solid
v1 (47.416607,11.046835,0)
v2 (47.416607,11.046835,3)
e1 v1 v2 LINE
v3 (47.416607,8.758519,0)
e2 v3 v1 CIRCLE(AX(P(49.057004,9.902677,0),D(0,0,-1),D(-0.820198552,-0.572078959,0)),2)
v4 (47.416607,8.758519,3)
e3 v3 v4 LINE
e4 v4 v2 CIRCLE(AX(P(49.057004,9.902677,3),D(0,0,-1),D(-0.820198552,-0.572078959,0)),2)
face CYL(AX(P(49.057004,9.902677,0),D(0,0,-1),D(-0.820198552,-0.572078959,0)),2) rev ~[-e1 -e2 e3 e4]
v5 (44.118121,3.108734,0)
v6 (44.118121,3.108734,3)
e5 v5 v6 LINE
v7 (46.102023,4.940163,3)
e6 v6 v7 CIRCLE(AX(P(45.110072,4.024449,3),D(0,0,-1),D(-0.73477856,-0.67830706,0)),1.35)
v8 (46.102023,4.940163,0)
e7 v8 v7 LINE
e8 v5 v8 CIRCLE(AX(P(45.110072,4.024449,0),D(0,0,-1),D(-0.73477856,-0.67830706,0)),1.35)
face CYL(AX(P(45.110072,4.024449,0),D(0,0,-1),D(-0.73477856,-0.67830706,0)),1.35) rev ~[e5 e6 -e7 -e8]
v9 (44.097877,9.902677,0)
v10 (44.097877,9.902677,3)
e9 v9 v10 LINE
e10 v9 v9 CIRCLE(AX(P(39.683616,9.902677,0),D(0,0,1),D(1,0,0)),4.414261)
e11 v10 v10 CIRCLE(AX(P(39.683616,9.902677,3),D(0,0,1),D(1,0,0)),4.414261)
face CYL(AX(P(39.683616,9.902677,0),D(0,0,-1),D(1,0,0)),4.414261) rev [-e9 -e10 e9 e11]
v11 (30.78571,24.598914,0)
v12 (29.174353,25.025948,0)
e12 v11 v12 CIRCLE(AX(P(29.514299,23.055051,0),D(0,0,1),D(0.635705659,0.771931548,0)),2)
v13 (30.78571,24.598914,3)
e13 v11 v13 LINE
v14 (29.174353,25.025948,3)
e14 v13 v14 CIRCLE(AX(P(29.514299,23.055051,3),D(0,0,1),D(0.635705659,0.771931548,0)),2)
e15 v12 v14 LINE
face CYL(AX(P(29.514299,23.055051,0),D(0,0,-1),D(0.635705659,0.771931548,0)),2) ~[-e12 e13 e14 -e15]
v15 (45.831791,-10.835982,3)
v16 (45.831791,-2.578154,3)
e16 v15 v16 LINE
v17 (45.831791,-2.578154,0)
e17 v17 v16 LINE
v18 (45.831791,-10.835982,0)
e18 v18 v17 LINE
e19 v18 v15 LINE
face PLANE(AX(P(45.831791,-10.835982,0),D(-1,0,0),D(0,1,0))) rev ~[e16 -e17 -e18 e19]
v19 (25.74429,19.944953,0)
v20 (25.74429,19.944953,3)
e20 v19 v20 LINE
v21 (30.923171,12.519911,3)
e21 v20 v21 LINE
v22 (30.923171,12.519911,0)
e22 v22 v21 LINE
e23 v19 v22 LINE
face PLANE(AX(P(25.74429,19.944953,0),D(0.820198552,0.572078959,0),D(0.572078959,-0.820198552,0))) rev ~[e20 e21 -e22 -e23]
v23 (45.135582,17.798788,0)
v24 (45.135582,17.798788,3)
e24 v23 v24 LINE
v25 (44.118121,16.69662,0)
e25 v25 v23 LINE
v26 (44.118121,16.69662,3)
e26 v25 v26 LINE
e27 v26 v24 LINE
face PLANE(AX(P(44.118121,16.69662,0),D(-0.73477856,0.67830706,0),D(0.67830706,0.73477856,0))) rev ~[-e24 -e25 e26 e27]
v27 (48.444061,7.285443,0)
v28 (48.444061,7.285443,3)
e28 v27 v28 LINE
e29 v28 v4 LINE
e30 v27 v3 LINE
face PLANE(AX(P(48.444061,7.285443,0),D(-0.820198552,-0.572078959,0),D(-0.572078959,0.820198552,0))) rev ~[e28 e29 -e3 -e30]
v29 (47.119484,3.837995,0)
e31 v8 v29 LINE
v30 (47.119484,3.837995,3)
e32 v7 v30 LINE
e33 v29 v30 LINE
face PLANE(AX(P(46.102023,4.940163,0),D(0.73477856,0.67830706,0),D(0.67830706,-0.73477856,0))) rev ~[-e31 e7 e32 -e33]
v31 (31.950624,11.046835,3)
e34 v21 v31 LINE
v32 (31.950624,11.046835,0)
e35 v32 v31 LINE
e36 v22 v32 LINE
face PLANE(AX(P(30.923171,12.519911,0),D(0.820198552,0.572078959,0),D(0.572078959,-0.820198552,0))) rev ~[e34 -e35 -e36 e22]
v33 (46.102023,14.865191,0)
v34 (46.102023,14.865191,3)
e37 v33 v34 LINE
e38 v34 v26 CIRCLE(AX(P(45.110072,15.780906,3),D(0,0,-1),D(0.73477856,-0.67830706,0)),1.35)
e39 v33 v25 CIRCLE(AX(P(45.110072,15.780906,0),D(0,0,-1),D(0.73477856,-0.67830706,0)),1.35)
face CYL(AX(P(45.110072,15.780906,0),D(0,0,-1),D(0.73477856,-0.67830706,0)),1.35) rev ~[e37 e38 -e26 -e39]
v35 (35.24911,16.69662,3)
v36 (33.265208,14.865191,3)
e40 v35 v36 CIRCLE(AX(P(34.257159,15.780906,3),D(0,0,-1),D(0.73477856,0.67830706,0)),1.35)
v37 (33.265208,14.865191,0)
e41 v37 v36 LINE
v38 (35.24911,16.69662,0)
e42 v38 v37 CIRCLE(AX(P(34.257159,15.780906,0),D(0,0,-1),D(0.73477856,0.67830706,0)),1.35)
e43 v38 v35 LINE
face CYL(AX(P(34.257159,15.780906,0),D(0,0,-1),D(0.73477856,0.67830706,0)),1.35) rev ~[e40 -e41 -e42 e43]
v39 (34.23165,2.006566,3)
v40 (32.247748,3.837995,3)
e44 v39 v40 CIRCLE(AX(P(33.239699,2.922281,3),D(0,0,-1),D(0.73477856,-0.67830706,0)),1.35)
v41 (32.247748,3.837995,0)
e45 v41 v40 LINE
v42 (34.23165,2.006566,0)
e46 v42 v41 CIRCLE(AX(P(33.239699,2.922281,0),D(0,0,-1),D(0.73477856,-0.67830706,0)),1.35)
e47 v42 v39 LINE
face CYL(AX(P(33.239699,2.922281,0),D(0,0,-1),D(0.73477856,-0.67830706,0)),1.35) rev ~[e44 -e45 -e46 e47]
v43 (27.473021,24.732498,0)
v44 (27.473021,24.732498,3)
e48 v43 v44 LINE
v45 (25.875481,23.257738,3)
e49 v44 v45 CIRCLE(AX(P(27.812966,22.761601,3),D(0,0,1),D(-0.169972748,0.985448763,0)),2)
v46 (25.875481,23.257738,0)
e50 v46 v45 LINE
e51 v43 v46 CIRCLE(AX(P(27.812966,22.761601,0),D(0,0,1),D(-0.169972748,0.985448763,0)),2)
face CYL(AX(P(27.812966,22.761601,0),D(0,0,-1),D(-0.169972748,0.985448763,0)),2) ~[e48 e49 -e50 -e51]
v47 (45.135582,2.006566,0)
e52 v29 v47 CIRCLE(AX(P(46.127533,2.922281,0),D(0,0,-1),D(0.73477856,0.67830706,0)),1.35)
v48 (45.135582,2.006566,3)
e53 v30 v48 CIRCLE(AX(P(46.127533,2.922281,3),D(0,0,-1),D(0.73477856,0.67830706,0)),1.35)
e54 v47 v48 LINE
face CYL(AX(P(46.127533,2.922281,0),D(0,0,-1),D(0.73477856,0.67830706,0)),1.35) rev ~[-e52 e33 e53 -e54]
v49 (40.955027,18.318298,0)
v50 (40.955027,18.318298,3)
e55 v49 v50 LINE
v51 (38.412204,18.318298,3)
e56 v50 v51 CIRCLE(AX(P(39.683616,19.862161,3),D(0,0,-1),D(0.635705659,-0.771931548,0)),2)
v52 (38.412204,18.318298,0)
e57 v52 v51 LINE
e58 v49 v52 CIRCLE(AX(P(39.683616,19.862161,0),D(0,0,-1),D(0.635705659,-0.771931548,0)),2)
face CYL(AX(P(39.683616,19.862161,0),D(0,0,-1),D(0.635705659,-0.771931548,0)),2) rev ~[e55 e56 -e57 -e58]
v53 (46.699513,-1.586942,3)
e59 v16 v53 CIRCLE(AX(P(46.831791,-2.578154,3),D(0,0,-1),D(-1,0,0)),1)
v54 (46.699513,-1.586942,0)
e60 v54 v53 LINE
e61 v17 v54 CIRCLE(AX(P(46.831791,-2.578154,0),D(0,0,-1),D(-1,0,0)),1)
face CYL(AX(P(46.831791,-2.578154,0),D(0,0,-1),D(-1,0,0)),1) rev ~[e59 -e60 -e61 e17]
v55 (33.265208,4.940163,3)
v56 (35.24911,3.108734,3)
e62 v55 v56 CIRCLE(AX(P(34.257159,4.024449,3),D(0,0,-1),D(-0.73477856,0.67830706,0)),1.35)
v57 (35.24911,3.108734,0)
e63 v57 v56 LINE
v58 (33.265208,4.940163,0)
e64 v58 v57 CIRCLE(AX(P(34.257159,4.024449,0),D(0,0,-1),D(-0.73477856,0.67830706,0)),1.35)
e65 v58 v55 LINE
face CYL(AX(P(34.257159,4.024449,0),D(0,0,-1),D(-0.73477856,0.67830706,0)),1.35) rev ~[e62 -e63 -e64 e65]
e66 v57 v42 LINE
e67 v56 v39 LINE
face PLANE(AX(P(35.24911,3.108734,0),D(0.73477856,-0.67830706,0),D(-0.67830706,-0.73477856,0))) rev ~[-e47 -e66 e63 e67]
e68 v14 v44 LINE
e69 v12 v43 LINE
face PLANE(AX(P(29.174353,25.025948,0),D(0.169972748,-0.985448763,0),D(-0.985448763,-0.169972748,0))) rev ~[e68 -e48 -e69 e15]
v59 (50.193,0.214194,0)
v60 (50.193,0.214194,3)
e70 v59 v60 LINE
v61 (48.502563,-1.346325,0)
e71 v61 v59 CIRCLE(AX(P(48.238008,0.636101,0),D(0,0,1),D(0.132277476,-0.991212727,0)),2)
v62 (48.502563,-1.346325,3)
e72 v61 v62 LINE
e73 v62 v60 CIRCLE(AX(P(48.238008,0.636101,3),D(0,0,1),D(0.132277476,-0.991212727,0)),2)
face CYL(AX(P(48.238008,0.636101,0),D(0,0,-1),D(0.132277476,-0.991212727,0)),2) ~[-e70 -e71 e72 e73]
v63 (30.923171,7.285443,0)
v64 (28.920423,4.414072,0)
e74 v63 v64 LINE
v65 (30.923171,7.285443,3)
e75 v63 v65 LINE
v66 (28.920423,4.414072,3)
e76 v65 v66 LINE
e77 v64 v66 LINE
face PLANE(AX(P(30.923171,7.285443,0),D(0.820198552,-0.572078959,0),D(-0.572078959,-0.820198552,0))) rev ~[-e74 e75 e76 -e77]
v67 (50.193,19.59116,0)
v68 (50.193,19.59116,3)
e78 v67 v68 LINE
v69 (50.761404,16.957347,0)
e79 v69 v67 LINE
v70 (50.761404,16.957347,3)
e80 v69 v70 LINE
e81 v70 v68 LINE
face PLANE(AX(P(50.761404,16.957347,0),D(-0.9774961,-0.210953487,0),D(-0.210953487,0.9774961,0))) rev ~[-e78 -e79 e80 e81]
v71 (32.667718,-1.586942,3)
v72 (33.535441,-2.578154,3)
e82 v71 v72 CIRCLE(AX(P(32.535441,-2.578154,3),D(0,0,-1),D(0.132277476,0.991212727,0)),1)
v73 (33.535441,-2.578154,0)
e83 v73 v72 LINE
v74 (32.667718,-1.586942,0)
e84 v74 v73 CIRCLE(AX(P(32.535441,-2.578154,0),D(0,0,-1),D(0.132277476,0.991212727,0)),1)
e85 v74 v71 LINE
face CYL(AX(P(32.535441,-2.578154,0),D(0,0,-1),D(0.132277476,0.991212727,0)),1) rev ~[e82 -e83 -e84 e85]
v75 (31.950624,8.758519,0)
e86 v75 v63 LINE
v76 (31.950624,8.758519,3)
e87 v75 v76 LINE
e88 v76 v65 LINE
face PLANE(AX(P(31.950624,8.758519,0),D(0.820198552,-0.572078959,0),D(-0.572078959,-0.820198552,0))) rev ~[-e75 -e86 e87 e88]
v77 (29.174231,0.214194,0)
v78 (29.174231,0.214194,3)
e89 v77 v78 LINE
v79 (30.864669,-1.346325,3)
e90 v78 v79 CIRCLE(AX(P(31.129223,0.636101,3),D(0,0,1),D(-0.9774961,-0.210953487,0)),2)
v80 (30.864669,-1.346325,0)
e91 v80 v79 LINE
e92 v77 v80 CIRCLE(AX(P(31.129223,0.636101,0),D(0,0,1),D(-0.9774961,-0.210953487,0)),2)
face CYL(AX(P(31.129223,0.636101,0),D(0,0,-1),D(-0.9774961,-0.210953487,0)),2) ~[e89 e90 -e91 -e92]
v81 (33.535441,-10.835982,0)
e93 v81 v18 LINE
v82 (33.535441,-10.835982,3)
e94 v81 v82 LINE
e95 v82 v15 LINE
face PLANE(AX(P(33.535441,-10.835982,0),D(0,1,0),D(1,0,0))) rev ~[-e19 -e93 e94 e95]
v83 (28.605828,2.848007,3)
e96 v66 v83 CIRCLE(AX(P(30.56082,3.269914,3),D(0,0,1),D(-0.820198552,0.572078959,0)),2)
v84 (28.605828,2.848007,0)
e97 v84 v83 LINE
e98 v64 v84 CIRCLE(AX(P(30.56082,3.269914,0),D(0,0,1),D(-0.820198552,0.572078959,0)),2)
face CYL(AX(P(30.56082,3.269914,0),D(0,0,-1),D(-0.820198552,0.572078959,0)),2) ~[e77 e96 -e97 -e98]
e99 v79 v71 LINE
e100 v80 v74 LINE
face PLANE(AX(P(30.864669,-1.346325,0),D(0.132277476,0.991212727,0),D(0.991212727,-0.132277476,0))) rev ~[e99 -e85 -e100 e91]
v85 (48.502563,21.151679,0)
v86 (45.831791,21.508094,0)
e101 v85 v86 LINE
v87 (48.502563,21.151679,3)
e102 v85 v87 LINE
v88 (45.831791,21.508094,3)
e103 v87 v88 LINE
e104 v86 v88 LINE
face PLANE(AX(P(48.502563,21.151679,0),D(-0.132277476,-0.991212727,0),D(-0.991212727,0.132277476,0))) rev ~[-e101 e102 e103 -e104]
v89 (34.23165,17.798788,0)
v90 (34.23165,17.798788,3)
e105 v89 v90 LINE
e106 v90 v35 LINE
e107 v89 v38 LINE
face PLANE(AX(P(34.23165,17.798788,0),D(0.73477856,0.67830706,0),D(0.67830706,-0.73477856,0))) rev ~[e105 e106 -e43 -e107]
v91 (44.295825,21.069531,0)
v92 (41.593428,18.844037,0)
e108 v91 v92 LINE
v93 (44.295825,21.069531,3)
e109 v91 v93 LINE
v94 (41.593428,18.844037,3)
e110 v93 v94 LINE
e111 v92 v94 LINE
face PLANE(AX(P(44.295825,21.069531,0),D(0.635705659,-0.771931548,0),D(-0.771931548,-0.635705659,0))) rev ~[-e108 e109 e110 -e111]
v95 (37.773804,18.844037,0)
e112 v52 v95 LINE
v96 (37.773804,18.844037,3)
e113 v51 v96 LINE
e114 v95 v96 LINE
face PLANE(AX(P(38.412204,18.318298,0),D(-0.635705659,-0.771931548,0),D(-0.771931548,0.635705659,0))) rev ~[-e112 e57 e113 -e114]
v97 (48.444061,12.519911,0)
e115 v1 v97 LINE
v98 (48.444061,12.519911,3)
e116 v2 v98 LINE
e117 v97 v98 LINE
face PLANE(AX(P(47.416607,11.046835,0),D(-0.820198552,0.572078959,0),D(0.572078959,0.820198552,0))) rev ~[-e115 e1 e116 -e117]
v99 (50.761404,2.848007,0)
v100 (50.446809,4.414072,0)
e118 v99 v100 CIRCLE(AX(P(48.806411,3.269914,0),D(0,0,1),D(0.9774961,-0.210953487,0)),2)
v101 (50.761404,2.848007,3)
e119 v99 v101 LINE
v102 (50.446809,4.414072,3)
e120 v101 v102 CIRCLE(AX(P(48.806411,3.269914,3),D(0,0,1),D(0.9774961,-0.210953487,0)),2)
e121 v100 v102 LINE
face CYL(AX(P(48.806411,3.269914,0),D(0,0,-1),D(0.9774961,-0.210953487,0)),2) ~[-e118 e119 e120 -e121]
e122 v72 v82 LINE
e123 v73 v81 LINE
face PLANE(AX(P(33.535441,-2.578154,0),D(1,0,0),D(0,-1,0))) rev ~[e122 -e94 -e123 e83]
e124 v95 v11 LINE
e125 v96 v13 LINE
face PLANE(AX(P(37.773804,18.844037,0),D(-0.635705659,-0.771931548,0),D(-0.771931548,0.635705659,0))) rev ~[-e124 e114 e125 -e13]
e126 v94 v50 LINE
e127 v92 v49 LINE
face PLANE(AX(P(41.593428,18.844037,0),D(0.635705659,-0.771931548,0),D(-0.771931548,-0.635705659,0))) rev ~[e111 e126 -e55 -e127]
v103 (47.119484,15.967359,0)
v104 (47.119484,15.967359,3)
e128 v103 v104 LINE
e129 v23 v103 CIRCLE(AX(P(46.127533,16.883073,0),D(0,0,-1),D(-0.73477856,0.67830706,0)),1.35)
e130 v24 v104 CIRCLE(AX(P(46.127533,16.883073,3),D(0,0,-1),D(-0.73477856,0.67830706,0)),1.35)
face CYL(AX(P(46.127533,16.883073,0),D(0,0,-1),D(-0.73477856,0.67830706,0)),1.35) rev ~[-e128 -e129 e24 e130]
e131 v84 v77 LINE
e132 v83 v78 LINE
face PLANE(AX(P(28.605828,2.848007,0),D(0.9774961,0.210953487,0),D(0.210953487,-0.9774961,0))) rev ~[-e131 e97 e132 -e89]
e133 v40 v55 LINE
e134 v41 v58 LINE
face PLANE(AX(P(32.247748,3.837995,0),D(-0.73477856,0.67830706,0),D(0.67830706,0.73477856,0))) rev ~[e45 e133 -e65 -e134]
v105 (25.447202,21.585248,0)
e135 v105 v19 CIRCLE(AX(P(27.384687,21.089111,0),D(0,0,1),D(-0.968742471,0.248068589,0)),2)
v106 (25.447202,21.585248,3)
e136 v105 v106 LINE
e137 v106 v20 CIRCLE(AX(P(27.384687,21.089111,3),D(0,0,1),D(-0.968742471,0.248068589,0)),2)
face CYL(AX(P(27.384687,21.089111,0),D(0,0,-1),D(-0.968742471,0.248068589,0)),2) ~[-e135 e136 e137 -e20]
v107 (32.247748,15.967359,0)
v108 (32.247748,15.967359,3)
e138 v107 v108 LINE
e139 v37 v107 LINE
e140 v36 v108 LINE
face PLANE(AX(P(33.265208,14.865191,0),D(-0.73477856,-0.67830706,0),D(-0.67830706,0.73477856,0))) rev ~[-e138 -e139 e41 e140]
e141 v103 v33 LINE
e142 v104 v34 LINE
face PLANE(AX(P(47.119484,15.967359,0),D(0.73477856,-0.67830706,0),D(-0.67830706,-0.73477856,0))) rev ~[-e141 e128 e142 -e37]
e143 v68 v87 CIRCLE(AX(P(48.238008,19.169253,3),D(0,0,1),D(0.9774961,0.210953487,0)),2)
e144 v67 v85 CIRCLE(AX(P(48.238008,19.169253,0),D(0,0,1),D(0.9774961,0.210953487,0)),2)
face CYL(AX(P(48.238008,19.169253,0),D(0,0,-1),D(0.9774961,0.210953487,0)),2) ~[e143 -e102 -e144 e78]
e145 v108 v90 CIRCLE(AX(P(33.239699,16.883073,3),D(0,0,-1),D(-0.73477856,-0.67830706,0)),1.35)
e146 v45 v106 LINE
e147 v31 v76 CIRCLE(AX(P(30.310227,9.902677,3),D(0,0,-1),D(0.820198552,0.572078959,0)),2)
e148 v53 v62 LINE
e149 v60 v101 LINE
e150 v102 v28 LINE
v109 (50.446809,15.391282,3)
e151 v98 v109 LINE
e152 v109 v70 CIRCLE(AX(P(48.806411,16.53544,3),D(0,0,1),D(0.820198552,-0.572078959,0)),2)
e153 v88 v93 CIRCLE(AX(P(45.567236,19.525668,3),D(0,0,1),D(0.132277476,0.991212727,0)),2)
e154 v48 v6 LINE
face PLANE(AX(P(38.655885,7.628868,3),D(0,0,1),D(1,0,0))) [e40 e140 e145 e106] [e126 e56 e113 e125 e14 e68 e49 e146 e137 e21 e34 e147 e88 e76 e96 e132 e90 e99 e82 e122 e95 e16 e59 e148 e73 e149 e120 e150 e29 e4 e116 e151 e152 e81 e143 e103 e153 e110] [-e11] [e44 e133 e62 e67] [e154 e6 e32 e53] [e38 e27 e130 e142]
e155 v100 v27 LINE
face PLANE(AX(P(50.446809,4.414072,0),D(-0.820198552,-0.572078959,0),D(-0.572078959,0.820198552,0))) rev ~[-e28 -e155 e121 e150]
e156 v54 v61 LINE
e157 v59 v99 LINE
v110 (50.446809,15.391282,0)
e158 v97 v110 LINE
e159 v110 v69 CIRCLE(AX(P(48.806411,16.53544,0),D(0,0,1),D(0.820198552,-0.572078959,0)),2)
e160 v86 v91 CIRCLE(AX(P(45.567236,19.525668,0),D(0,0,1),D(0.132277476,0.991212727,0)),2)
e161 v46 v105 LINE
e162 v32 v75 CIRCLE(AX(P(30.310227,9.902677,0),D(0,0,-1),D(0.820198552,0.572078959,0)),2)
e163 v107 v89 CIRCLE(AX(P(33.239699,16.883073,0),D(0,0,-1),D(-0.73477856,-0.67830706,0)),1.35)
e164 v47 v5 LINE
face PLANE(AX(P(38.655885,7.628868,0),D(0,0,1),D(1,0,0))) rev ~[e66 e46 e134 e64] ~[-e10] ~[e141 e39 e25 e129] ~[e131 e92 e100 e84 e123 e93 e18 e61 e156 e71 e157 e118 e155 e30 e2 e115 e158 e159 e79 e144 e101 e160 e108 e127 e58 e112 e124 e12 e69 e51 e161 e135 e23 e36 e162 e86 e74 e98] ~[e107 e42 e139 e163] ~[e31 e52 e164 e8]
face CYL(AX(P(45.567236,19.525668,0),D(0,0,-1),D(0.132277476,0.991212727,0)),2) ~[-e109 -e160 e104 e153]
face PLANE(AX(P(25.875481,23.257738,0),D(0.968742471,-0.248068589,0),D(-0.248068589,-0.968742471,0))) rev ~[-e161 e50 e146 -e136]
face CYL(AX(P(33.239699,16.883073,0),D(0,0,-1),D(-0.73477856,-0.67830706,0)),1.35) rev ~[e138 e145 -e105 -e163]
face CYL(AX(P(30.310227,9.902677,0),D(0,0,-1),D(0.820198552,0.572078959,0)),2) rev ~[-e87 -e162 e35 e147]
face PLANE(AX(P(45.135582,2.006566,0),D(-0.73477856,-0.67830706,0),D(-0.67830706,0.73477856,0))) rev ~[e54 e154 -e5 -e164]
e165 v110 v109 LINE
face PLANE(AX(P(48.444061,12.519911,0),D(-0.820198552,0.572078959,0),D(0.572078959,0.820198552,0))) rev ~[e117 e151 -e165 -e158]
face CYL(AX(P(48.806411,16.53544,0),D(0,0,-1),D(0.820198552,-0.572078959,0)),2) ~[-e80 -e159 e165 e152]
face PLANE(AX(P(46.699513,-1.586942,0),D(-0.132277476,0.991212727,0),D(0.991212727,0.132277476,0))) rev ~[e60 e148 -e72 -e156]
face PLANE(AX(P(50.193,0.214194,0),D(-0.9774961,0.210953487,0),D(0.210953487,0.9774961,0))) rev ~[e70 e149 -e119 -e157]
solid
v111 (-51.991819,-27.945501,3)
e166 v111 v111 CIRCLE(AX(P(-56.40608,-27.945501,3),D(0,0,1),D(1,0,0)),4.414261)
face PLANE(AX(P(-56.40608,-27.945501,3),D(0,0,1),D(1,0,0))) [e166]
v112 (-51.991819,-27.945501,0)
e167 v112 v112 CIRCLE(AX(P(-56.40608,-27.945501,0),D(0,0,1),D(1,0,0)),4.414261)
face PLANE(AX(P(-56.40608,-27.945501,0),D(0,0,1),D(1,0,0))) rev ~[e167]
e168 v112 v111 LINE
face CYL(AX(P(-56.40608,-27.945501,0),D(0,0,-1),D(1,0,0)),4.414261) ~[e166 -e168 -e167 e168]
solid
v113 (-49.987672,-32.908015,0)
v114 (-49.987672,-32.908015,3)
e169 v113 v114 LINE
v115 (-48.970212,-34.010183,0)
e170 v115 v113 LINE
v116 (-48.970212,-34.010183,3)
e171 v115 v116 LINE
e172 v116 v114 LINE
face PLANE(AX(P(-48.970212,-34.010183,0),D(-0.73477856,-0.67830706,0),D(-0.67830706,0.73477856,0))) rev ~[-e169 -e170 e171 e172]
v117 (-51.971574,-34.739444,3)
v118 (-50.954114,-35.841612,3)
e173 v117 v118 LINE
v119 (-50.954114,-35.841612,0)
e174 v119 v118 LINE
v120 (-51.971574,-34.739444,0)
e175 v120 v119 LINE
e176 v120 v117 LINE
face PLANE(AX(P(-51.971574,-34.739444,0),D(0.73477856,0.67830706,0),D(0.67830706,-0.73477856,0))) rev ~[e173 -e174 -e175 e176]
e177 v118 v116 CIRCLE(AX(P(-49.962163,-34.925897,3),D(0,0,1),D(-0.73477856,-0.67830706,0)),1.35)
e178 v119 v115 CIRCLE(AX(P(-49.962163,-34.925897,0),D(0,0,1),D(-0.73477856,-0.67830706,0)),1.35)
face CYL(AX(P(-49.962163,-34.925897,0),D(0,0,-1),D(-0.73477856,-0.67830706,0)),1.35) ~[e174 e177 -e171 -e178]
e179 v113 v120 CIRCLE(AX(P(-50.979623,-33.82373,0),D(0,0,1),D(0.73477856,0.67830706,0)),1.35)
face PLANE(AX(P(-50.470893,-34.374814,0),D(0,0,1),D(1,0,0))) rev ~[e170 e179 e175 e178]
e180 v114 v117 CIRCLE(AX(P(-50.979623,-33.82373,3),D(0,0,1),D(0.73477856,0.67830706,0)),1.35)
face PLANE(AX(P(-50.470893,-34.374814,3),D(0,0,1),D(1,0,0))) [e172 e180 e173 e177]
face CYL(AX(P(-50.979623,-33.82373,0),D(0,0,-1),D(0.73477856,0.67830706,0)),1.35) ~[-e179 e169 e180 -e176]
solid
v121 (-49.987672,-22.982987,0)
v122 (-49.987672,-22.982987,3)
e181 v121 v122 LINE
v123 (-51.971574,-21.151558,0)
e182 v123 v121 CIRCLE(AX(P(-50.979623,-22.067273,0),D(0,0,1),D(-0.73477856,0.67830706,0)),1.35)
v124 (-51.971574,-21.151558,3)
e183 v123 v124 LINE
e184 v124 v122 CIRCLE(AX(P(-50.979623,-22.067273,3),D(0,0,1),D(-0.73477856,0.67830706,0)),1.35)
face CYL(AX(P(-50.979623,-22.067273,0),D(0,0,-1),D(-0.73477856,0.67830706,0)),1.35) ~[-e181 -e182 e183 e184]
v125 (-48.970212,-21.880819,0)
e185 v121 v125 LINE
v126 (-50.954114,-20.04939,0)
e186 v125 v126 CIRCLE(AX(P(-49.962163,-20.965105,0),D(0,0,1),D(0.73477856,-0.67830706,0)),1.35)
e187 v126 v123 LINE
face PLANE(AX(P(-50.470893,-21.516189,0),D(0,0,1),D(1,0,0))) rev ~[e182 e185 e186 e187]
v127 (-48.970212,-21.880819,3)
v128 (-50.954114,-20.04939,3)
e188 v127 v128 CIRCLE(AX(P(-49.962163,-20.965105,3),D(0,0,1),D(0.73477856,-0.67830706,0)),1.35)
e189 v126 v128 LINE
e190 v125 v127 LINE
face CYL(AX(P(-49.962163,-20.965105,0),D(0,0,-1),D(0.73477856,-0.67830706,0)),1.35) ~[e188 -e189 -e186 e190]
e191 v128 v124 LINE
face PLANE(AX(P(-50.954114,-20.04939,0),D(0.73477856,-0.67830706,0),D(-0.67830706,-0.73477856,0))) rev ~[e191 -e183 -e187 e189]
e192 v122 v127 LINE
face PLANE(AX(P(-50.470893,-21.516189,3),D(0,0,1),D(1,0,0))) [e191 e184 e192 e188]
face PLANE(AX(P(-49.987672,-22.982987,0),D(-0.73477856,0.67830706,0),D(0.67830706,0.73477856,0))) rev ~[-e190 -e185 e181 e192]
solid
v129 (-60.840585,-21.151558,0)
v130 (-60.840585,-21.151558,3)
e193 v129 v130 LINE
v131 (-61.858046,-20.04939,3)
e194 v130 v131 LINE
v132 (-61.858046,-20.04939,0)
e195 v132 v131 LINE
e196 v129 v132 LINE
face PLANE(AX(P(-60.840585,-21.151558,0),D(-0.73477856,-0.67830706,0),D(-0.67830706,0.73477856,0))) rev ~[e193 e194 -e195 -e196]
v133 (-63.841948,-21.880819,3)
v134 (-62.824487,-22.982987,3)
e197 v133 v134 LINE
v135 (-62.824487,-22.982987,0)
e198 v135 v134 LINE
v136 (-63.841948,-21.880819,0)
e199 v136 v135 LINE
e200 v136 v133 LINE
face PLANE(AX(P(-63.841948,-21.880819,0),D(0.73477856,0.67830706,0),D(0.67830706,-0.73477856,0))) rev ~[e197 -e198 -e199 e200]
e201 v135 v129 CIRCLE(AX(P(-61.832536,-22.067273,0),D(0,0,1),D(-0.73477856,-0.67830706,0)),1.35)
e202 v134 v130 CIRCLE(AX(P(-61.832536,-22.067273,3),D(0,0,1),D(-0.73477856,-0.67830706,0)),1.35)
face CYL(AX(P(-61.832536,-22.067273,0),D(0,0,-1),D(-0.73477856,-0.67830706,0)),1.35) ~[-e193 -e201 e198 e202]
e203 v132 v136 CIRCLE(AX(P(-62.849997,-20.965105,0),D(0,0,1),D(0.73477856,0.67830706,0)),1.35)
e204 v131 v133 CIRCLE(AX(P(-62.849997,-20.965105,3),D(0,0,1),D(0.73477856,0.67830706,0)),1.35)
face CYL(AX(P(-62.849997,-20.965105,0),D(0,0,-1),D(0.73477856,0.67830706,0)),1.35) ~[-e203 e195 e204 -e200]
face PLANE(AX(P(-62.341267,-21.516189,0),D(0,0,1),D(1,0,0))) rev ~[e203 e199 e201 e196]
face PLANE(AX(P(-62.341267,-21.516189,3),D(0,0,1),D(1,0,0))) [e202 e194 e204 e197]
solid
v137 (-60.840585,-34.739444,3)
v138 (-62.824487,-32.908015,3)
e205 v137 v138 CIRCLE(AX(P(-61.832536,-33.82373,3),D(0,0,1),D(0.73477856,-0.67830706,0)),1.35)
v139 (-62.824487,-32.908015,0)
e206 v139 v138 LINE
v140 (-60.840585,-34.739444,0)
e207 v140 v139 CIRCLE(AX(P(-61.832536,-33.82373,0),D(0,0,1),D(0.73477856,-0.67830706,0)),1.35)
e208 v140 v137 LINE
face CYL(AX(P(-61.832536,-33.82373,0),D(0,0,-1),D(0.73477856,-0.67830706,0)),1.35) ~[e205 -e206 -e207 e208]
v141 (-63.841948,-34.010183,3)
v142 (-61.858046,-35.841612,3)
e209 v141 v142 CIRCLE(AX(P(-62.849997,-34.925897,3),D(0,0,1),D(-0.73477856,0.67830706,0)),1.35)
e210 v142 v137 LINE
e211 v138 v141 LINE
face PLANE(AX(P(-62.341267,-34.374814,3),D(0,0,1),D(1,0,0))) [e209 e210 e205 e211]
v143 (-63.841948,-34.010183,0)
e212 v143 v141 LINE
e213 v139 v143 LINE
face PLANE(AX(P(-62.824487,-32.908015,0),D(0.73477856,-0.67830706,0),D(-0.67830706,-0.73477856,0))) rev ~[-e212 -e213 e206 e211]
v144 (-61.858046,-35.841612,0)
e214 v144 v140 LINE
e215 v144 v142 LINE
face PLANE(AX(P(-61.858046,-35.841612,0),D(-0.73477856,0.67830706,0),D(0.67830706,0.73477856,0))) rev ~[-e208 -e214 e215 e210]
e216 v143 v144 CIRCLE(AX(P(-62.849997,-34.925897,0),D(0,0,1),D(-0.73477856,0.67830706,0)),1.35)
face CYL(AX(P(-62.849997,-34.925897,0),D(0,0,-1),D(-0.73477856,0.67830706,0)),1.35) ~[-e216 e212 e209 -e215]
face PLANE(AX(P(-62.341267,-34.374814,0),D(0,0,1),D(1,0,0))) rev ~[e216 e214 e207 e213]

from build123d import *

# Parameters (mm, degrees)
F0_R     = 4.4142610292
F1_DEPTH = 3


with BuildPart() as f1:
    # F0 (on Top) → F1 (new body)
    with BuildSketch(Plane.XY):
        with BuildLine():
            Line((25.7442902372, 19.9449532418), (30.9231709689, 12.5199109316))
            Line((30.9231709689, 12.5199109316), (31.950624298, 11.0468350227))
            ThreePointArc((31.950624298, 11.0468350227), (32.3102271943, 9.9026771044), (31.950624298, 8.7585191861))
            Line((31.950624298, 8.7585191861), (30.9231709689, 7.2854432773))
            Line((30.9231709689, 7.2854432773), (28.9204229775, 4.4140721562))
            ThreePointArc((28.9204229775, 4.4140721562), (28.5999922268, 3.6638103222), (28.6058278806, 2.8480072634))
            Line((28.6058278806, 2.8480072634), (29.1742312803, 0.2141939336))
            ThreePointArc((29.1742312803, 0.2141939336), (29.7726093608, -0.8334562119), (30.8646685292, -1.3463245451))
            Line((30.8646685292, -1.3463245451), (32.6677180839, -1.5869417583))
            ThreePointArc((32.6677180839, -1.5869417583), (33.2878625229, -1.9194730277), (33.535440608, -2.5781544849))
            Line((33.535440608, -2.5781544849), (33.535440608, -10.8359819278))
            Line((33.535440608, -10.8359819278), (45.8317909572, -10.8359819278))
            Line((45.8317909572, -10.8359819278), (45.8317909572, -2.5781544849))
            ThreePointArc((45.8317909572, -2.5781544849), (46.0793690423, -1.9194730277), (46.6995134813, -1.5869417583))
            Line((46.6995134813, -1.5869417583), (48.502563036, -1.3463245451))
            ThreePointArc((48.502563036, -1.3463245451), (49.5946222044, -0.8334562119), (50.193000285, 0.2141939336))
            Line((50.193000285, 0.2141939336), (50.7614036847, 2.8480072634))
            ThreePointArc((50.7614036847, 2.8480072634), (50.7672393384, 3.6638103222), (50.4468085877, 4.4140721562))
            Line((50.4468085877, 4.4140721562), (48.4440605963, 7.2854432773))
            Line((48.4440605963, 7.2854432773), (47.4166072672, 8.7585191861))
            ThreePointArc((47.4166072672, 8.7585191861), (47.0570043709, 9.9026771044), (47.4166072672, 11.0468350227))
            Line((47.4166072672, 11.0468350227), (48.4440605963, 12.5199109316))
            Line((48.4440605963, 12.5199109316), (50.4468085877, 15.3912820527))
            ThreePointArc((50.4468085877, 15.3912820527), (50.7672393384, 16.1415438867), (50.7614036847, 16.9573469455))
            Line((50.7614036847, 16.9573469455), (50.193000285, 19.5911602753))
            ThreePointArc((50.193000285, 19.5911602753), (49.5946222044, 20.6388104208), (48.502563036, 21.151678754))
            Line((48.502563036, 21.151678754), (45.8317909572, 21.5080936584))
            ThreePointArc((45.8317909572, 21.5080936584), (45.0181238394, 21.4488103812), (44.2958246872, 21.0695313015))
            Line((44.2958246872, 21.0695313015), (41.5934278716, 18.844037405))
            Line((41.5934278716, 18.844037405), (40.9550271008, 18.3182978058))
            ThreePointArc((40.9550271008, 18.3182978058), (39.6836157826, 17.862160902), (38.4122044644, 18.3182978058))
            Line((38.4122044644, 18.3182978058), (37.7738036936, 18.844037405))
            Line((37.7738036936, 18.844037405), (30.7857099055, 24.5989139589))
            ThreePointArc((30.7857099055, 24.5989139589), (30.0266429494, 24.9883131973), (29.1743530908, 25.025948389))
            Line((29.1743530908, 25.025948389), (27.4730209089, 24.7324982196))
            ThreePointArc((27.4730209089, 24.7324982196), (26.4563522851, 24.2311578132), (25.8754814635, 23.2577378718))
            Line((25.8754814635, 23.2577378718), (25.4472023991, 21.5852483387))
            ThreePointArc((25.4472023991, 21.5852483387), (25.4167056377, 20.7326732053), (25.7442902372, 19.9449532418))
        make_face()
        with BuildLine():
            ThreePointArc((33.2652082458, 4.9401631557), (35.1728738329, 5.0163996805), (35.2491103578, 3.1087340934))
            Line((35.2491103578, 3.1087340934), (34.2316497676, 2.0065662534))
            ThreePointArc((34.2316497676, 2.0065662534), (32.3239841805, 1.9303297286), (32.2477476557, 3.8379953157))
            Line((32.2477476557, 3.8379953157), (33.2652082458, 4.9401631557))
        make_face(mode=Mode.SUBTRACT)
        with BuildLine():
            ThreePointArc((44.1181212074, 3.1087340934), (44.1943577323, 5.0163996805), (46.1020233194, 4.9401631557))
            Line((46.1020233194, 4.9401631557), (47.1194839096, 3.8379953157))
            ThreePointArc((47.1194839096, 3.8379953157), (47.0432473847, 1.9303297286), (45.1355817976, 2.0065662534))
            Line((45.1355817976, 2.0065662534), (44.1181212074, 3.1087340934))
        make_face(mode=Mode.SUBTRACT)
        with BuildLine():
            ThreePointArc((35.2491103578, 16.6966201155), (35.1728738329, 14.7889545284), (33.2652082458, 14.8651910532))
            Line((33.2652082458, 14.8651910532), (32.2477476557, 15.9673588932))
            ThreePointArc((32.2477476557, 15.9673588932), (32.3239841805, 17.8750244803), (34.2316497676, 17.7987879555))
            Line((34.2316497676, 17.7987879555), (35.2491103578, 16.6966201155))
        make_face(mode=Mode.SUBTRACT)
        with Locations((39.6836157826, 9.9026771044)):
            Circle(F0_R, mode=Mode.SUBTRACT)
        with BuildLine():
            Line((47.1194839096, 15.9673588932), (46.1020233194, 14.8651910532))
            ThreePointArc((46.1020233194, 14.8651910532), (44.1943577323, 14.7889545284), (44.1181212074, 16.6966201155))
            Line((44.1181212074, 16.6966201155), (45.1355817976, 17.7987879555))
            ThreePointArc((45.1355817976, 17.7987879555), (47.0432473847, 17.8750244803), (47.1194839096, 15.9673588932))
        make_face(mode=Mode.SUBTRACT)
    extrude(amount=F1_DEPTH)


with BuildPart() as f1b:
    # F0 (on Top) → F1, piece 2 (new body)
    with BuildSketch(Plane.XY):
        with BuildLine():
            Line((-63.8419478975, -21.8808193593), (-62.8244873074, -22.9829871993))
            ThreePointArc((-62.8244873074, -22.9829871993), (-60.9168217203, -23.0592237242), (-60.8405851954, -21.1515581371))
            Line((-60.8405851954, -21.1515581371), (-61.8580457856, -20.0493902971))
            ThreePointArc((-61.8580457856, -20.0493902971), (-63.7657113727, -19.9731537722), (-63.8419478975, -21.8808193593))
        make_face()
    extrude(amount=F1_DEPTH)


with BuildPart() as f1c:
    # F0 (on Top) → F1, piece 3 (new body)
    with BuildSketch(Plane.XY):
        with Locations((-56.4060797706, -27.9455011481)):
            Circle(F0_R)
    extrude(amount=F1_DEPTH)


with BuildPart() as f1d:
    # F0 (on Top) → F1, piece 4 (new body)
    with BuildSketch(Plane.XY):
        with BuildLine():
            ThreePointArc((-51.9715743458, -21.1515581371), (-51.8953378209, -23.0592237242), (-49.9876722338, -22.9829871993))
            Line((-49.9876722338, -22.9829871993), (-48.9702116437, -21.8808193593))
            ThreePointArc((-48.9702116437, -21.8808193593), (-49.0464481685, -19.9731537722), (-50.9541137556, -20.0493902971))
            Line((-50.9541137556, -20.0493902971), (-51.9715743458, -21.1515581371))
        make_face()
    extrude(amount=F1_DEPTH)


with BuildPart() as f1e:
    # F0 (on Top) → F1, piece 5 (new body)
    with BuildSketch(Plane.XY):
        with BuildLine():
            Line((-48.9702116437, -34.0101829368), (-49.9876722338, -32.9080150968))
            ThreePointArc((-49.9876722338, -32.9080150968), (-51.8953378209, -32.831778572), (-51.9715743458, -34.7394441591))
            Line((-51.9715743458, -34.7394441591), (-50.9541137556, -35.8416119991))
            ThreePointArc((-50.9541137556, -35.8416119991), (-49.0464481685, -35.9178485239), (-48.9702116437, -34.0101829368))
        make_face()
    extrude(amount=F1_DEPTH)


with BuildPart() as f1f:
    # F0 (on Top) → F1, piece 6 (new body)
    with BuildSketch(Plane.XY):
        with BuildLine():
            Line((-61.8580457856, -35.8416119991), (-60.8405851954, -34.7394441591))
            ThreePointArc((-60.8405851954, -34.7394441591), (-60.9168217203, -32.831778572), (-62.8244873074, -32.9080150968))
            Line((-62.8244873074, -32.9080150968), (-63.8419478975, -34.0101829368))
            ThreePointArc((-63.8419478975, -34.0101829368), (-63.7657113727, -35.9178485239), (-61.8580457856, -35.8416119991))
        make_face()
    extrude(amount=F1_DEPTH)


solid = Compound([f1.part, f1b.part, f1c.part, f1d.part, f1e.part, f1f.part])
